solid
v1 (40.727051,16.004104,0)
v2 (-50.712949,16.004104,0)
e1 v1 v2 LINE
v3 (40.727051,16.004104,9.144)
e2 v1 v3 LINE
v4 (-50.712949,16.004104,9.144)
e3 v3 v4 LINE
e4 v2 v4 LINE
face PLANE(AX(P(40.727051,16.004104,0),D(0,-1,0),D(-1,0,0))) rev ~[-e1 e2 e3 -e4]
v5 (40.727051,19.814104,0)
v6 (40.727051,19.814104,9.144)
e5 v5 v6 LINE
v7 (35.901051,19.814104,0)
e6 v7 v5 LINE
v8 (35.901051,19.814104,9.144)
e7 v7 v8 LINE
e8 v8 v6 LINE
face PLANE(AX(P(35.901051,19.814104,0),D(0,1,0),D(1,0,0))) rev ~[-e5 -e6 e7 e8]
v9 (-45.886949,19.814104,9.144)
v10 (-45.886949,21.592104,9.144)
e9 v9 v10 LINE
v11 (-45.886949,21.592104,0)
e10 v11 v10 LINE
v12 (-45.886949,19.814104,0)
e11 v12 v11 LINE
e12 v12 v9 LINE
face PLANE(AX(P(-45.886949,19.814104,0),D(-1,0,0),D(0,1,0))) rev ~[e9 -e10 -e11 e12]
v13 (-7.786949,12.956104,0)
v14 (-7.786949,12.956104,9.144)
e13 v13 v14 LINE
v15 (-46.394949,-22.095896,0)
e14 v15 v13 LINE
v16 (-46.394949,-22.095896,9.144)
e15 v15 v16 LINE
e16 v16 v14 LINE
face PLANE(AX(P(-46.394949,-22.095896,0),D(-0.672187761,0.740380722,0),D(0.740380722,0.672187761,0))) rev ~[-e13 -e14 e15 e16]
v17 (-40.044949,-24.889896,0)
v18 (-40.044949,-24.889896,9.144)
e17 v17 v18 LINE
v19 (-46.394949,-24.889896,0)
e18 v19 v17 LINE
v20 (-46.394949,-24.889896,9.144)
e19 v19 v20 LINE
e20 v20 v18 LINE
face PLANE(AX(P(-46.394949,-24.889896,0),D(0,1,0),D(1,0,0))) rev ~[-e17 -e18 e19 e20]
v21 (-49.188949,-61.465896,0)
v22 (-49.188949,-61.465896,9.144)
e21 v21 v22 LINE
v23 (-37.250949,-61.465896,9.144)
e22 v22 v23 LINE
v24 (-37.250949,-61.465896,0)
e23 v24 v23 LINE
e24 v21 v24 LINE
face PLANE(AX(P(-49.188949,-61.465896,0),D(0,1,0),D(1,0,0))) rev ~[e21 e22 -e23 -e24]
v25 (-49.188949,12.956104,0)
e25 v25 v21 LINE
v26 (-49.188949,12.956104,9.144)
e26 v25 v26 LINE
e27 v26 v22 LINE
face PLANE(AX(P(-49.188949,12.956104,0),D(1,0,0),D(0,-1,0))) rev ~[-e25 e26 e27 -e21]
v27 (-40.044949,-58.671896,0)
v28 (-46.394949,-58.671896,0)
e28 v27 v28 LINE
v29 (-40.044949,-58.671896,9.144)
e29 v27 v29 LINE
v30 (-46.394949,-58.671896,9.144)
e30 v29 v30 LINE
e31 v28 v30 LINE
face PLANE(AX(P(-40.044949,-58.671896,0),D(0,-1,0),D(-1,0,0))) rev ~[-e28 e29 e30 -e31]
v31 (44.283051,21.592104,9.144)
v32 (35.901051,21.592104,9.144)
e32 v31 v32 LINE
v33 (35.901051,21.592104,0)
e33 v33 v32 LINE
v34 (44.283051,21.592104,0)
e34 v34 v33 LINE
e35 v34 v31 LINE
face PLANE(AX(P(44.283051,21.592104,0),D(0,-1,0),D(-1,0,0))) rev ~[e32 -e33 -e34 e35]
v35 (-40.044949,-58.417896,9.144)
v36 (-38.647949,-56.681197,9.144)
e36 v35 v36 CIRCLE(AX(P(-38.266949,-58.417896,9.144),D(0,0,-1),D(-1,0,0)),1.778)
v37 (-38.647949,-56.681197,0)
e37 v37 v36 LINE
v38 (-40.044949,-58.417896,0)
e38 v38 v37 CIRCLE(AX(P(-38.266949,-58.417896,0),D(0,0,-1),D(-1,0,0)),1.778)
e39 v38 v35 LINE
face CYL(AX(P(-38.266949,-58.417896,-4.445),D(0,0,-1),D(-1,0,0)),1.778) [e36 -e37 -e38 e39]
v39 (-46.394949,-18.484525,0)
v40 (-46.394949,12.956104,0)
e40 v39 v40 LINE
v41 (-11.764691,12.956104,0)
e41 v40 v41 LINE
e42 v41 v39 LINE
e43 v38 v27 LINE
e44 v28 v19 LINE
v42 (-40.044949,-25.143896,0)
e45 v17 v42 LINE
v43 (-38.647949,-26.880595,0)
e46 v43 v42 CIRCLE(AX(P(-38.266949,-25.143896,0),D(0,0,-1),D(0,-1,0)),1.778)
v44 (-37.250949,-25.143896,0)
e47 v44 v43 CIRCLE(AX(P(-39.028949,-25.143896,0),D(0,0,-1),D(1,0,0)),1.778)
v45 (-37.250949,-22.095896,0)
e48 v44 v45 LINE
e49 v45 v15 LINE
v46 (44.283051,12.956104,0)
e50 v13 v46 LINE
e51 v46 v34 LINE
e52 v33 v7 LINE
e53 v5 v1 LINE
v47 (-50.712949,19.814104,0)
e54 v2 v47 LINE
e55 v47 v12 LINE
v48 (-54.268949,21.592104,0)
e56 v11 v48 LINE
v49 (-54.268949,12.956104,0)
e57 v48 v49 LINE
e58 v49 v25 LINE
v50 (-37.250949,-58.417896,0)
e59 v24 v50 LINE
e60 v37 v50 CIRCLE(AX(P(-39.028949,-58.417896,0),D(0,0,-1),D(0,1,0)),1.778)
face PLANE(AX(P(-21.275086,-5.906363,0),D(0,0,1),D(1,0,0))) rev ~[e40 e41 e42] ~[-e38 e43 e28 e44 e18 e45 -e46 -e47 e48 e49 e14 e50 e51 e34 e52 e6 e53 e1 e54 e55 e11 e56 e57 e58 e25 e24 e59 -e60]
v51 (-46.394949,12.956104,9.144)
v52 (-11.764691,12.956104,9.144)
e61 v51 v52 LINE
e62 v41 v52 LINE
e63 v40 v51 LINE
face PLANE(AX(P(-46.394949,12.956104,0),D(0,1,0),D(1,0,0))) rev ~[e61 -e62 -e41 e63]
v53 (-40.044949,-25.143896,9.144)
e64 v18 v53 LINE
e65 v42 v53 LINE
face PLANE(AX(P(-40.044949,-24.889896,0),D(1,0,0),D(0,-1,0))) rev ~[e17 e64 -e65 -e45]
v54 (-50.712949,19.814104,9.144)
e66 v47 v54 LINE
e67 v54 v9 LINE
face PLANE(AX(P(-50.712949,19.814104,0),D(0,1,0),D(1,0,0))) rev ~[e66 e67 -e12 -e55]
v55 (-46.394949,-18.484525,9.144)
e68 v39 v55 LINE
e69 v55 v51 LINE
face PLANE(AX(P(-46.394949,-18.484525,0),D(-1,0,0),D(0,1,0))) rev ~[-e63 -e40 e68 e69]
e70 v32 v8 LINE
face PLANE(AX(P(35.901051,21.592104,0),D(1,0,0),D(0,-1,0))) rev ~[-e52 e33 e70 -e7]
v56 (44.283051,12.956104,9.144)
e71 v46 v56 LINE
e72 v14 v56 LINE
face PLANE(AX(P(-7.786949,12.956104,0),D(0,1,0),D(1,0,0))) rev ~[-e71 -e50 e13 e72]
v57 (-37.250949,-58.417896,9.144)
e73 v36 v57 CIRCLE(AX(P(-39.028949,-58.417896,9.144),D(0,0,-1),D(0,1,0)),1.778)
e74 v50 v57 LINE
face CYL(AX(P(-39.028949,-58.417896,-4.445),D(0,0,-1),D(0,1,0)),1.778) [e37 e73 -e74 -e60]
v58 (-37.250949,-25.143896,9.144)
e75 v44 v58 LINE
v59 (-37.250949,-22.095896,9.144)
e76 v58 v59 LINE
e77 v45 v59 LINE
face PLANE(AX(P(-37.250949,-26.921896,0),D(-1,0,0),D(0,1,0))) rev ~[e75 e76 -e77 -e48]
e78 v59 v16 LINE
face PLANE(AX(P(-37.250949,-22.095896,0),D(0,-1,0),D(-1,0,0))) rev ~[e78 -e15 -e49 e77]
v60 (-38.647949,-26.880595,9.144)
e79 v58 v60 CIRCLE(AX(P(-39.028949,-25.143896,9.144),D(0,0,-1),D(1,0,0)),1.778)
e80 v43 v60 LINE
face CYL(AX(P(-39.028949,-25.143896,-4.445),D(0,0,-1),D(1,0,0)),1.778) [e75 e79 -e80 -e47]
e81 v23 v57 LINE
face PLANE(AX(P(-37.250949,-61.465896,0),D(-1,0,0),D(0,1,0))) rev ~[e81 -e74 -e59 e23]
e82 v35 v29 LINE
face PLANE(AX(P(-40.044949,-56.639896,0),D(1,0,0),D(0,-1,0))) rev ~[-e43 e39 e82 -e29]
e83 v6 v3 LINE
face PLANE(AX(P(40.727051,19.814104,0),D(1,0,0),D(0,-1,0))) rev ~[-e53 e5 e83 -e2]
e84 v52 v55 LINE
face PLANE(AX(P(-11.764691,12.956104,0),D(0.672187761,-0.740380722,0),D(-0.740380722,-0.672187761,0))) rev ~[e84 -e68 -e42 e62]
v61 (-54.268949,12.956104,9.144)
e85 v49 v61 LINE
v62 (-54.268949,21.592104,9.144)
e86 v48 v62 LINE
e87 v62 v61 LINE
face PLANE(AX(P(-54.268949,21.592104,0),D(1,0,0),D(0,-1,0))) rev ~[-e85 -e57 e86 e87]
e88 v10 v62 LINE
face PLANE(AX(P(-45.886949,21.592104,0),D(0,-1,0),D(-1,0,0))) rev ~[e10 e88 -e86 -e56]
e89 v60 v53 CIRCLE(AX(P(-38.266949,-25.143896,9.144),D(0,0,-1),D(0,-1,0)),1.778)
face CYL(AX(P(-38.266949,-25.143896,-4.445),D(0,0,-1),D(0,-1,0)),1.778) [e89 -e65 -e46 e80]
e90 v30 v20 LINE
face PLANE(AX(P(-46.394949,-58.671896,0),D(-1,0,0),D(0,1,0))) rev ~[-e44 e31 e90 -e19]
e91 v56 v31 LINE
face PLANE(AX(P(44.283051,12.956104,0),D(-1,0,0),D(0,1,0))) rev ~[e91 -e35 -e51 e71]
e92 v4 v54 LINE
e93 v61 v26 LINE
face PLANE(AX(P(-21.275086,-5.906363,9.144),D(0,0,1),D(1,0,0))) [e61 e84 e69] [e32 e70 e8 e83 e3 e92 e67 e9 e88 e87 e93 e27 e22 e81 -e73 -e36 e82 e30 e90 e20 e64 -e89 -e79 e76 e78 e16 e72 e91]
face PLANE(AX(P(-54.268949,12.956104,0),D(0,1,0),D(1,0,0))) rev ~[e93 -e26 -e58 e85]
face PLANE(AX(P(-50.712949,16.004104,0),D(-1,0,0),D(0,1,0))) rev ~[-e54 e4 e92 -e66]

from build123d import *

# Parameters (mm, degrees)
F1_DEPTH    = 9.144
F2_T1_DEPTH = 18.034


# Not quite as in the source:
# - a fillet or chamfer that OpenCascade refuses, or shapes differently, is made with other operations: its cross-section is extruded or revolved along the edge and cut away or added


with BuildPart() as f1:
    # F0 (on Top) → F1 (new body)
    with BuildSketch(Plane.XY):
        Polygon((-45.8869487338, 19.8141042413), (-45.8869487338, 21.5921042413), (-54.2689487338, 21.5921042413), (-54.2689487338, 12.9561042413), (-49.1889487338, 12.9561042413), (-49.1889487338, -61.4658957587), (-37.2509487338, -61.4658957587), (-37.2509487338, -56.6398957587), (-40.0449487338, -56.6398957587), (-40.0449487338, -58.6718957587), (-46.3949487338, -58.6718957587), (-46.3949487338, -37.378154695), (-46.3949487338, -27.9378957587), (-46.3949487338, -24.8898957587), (-40.0449487338, -24.8898957587), (-40.0449487338, -26.9218957587), (-37.2509487338, -26.9218957587), (-37.2509487338, -22.0958957587), (-46.3949487338, -22.0958957587), (-7.7869487338, 12.9561042413), (44.2830512662, 12.9561042413), (44.2830512662, 21.5921042413), (35.9010512662, 21.5921042413), (35.9010512662, 19.8141042413), (40.7270512662, 19.8141042413), (40.7270512662, 16.0041042413), (-50.7129487338, 16.0041042413), (-50.7129487338, 19.8141042413), align=None)
        Polygon((-11.7646907362, 12.9561042413), (-46.3949487338, -18.4845247302), (-46.3949487338, 12.9561042413), align=None, mode=Mode.SUBTRACT)
    extrude(amount=F1_DEPTH)

    # F2: fillet of radius 1.778 on 4 edges, made by hand

    # F2_s2 → F2_t1 (cut)
    with BuildSketch(Plane.XY.offset(-4.445)):
        with BuildLine():
            ThreePointArc((-38.2669487338, -26.9218957587), (-39.5241845908, -26.4011316156), (-40.0449487338, -25.1438957587))
            Line((-40.0449487338, -25.1438957587), (-40.0449487338, -26.9218957587))
            Line((-40.0449487338, -26.9218957587), (-38.2669487338, -26.9218957587))
        make_face()
        with BuildLine():
            ThreePointArc((-37.2509487338, -25.1438957587), (-37.7717128769, -26.4011316156), (-39.0289487338, -26.9218957587))
            Line((-39.0289487338, -26.9218957587), (-37.2509487338, -26.9218957587))
            Line((-37.2509487338, -26.9218957587), (-37.2509487338, -25.1438957587))
        make_face()
        with BuildLine():
            ThreePointArc((-39.0289487338, -56.6398957587), (-37.7717128769, -57.1606599017), (-37.2509487338, -58.4178957587))
            Line((-37.2509487338, -58.4178957587), (-37.2509487338, -56.6398957587))
            Line((-37.2509487338, -56.6398957587), (-39.0289487338, -56.6398957587))
        make_face()
        with BuildLine():
            ThreePointArc((-40.0449487338, -58.4178957587), (-39.5241845908, -57.1606599017), (-38.2669487338, -56.6398957587))
            Line((-38.2669487338, -56.6398957587), (-40.0449487338, -56.6398957587))
            Line((-40.0449487338, -56.6398957587), (-40.0449487338, -58.4178957587))
        make_face()
    extrude(amount=F2_T1_DEPTH, mode=Mode.SUBTRACT)


solid = f1.part
